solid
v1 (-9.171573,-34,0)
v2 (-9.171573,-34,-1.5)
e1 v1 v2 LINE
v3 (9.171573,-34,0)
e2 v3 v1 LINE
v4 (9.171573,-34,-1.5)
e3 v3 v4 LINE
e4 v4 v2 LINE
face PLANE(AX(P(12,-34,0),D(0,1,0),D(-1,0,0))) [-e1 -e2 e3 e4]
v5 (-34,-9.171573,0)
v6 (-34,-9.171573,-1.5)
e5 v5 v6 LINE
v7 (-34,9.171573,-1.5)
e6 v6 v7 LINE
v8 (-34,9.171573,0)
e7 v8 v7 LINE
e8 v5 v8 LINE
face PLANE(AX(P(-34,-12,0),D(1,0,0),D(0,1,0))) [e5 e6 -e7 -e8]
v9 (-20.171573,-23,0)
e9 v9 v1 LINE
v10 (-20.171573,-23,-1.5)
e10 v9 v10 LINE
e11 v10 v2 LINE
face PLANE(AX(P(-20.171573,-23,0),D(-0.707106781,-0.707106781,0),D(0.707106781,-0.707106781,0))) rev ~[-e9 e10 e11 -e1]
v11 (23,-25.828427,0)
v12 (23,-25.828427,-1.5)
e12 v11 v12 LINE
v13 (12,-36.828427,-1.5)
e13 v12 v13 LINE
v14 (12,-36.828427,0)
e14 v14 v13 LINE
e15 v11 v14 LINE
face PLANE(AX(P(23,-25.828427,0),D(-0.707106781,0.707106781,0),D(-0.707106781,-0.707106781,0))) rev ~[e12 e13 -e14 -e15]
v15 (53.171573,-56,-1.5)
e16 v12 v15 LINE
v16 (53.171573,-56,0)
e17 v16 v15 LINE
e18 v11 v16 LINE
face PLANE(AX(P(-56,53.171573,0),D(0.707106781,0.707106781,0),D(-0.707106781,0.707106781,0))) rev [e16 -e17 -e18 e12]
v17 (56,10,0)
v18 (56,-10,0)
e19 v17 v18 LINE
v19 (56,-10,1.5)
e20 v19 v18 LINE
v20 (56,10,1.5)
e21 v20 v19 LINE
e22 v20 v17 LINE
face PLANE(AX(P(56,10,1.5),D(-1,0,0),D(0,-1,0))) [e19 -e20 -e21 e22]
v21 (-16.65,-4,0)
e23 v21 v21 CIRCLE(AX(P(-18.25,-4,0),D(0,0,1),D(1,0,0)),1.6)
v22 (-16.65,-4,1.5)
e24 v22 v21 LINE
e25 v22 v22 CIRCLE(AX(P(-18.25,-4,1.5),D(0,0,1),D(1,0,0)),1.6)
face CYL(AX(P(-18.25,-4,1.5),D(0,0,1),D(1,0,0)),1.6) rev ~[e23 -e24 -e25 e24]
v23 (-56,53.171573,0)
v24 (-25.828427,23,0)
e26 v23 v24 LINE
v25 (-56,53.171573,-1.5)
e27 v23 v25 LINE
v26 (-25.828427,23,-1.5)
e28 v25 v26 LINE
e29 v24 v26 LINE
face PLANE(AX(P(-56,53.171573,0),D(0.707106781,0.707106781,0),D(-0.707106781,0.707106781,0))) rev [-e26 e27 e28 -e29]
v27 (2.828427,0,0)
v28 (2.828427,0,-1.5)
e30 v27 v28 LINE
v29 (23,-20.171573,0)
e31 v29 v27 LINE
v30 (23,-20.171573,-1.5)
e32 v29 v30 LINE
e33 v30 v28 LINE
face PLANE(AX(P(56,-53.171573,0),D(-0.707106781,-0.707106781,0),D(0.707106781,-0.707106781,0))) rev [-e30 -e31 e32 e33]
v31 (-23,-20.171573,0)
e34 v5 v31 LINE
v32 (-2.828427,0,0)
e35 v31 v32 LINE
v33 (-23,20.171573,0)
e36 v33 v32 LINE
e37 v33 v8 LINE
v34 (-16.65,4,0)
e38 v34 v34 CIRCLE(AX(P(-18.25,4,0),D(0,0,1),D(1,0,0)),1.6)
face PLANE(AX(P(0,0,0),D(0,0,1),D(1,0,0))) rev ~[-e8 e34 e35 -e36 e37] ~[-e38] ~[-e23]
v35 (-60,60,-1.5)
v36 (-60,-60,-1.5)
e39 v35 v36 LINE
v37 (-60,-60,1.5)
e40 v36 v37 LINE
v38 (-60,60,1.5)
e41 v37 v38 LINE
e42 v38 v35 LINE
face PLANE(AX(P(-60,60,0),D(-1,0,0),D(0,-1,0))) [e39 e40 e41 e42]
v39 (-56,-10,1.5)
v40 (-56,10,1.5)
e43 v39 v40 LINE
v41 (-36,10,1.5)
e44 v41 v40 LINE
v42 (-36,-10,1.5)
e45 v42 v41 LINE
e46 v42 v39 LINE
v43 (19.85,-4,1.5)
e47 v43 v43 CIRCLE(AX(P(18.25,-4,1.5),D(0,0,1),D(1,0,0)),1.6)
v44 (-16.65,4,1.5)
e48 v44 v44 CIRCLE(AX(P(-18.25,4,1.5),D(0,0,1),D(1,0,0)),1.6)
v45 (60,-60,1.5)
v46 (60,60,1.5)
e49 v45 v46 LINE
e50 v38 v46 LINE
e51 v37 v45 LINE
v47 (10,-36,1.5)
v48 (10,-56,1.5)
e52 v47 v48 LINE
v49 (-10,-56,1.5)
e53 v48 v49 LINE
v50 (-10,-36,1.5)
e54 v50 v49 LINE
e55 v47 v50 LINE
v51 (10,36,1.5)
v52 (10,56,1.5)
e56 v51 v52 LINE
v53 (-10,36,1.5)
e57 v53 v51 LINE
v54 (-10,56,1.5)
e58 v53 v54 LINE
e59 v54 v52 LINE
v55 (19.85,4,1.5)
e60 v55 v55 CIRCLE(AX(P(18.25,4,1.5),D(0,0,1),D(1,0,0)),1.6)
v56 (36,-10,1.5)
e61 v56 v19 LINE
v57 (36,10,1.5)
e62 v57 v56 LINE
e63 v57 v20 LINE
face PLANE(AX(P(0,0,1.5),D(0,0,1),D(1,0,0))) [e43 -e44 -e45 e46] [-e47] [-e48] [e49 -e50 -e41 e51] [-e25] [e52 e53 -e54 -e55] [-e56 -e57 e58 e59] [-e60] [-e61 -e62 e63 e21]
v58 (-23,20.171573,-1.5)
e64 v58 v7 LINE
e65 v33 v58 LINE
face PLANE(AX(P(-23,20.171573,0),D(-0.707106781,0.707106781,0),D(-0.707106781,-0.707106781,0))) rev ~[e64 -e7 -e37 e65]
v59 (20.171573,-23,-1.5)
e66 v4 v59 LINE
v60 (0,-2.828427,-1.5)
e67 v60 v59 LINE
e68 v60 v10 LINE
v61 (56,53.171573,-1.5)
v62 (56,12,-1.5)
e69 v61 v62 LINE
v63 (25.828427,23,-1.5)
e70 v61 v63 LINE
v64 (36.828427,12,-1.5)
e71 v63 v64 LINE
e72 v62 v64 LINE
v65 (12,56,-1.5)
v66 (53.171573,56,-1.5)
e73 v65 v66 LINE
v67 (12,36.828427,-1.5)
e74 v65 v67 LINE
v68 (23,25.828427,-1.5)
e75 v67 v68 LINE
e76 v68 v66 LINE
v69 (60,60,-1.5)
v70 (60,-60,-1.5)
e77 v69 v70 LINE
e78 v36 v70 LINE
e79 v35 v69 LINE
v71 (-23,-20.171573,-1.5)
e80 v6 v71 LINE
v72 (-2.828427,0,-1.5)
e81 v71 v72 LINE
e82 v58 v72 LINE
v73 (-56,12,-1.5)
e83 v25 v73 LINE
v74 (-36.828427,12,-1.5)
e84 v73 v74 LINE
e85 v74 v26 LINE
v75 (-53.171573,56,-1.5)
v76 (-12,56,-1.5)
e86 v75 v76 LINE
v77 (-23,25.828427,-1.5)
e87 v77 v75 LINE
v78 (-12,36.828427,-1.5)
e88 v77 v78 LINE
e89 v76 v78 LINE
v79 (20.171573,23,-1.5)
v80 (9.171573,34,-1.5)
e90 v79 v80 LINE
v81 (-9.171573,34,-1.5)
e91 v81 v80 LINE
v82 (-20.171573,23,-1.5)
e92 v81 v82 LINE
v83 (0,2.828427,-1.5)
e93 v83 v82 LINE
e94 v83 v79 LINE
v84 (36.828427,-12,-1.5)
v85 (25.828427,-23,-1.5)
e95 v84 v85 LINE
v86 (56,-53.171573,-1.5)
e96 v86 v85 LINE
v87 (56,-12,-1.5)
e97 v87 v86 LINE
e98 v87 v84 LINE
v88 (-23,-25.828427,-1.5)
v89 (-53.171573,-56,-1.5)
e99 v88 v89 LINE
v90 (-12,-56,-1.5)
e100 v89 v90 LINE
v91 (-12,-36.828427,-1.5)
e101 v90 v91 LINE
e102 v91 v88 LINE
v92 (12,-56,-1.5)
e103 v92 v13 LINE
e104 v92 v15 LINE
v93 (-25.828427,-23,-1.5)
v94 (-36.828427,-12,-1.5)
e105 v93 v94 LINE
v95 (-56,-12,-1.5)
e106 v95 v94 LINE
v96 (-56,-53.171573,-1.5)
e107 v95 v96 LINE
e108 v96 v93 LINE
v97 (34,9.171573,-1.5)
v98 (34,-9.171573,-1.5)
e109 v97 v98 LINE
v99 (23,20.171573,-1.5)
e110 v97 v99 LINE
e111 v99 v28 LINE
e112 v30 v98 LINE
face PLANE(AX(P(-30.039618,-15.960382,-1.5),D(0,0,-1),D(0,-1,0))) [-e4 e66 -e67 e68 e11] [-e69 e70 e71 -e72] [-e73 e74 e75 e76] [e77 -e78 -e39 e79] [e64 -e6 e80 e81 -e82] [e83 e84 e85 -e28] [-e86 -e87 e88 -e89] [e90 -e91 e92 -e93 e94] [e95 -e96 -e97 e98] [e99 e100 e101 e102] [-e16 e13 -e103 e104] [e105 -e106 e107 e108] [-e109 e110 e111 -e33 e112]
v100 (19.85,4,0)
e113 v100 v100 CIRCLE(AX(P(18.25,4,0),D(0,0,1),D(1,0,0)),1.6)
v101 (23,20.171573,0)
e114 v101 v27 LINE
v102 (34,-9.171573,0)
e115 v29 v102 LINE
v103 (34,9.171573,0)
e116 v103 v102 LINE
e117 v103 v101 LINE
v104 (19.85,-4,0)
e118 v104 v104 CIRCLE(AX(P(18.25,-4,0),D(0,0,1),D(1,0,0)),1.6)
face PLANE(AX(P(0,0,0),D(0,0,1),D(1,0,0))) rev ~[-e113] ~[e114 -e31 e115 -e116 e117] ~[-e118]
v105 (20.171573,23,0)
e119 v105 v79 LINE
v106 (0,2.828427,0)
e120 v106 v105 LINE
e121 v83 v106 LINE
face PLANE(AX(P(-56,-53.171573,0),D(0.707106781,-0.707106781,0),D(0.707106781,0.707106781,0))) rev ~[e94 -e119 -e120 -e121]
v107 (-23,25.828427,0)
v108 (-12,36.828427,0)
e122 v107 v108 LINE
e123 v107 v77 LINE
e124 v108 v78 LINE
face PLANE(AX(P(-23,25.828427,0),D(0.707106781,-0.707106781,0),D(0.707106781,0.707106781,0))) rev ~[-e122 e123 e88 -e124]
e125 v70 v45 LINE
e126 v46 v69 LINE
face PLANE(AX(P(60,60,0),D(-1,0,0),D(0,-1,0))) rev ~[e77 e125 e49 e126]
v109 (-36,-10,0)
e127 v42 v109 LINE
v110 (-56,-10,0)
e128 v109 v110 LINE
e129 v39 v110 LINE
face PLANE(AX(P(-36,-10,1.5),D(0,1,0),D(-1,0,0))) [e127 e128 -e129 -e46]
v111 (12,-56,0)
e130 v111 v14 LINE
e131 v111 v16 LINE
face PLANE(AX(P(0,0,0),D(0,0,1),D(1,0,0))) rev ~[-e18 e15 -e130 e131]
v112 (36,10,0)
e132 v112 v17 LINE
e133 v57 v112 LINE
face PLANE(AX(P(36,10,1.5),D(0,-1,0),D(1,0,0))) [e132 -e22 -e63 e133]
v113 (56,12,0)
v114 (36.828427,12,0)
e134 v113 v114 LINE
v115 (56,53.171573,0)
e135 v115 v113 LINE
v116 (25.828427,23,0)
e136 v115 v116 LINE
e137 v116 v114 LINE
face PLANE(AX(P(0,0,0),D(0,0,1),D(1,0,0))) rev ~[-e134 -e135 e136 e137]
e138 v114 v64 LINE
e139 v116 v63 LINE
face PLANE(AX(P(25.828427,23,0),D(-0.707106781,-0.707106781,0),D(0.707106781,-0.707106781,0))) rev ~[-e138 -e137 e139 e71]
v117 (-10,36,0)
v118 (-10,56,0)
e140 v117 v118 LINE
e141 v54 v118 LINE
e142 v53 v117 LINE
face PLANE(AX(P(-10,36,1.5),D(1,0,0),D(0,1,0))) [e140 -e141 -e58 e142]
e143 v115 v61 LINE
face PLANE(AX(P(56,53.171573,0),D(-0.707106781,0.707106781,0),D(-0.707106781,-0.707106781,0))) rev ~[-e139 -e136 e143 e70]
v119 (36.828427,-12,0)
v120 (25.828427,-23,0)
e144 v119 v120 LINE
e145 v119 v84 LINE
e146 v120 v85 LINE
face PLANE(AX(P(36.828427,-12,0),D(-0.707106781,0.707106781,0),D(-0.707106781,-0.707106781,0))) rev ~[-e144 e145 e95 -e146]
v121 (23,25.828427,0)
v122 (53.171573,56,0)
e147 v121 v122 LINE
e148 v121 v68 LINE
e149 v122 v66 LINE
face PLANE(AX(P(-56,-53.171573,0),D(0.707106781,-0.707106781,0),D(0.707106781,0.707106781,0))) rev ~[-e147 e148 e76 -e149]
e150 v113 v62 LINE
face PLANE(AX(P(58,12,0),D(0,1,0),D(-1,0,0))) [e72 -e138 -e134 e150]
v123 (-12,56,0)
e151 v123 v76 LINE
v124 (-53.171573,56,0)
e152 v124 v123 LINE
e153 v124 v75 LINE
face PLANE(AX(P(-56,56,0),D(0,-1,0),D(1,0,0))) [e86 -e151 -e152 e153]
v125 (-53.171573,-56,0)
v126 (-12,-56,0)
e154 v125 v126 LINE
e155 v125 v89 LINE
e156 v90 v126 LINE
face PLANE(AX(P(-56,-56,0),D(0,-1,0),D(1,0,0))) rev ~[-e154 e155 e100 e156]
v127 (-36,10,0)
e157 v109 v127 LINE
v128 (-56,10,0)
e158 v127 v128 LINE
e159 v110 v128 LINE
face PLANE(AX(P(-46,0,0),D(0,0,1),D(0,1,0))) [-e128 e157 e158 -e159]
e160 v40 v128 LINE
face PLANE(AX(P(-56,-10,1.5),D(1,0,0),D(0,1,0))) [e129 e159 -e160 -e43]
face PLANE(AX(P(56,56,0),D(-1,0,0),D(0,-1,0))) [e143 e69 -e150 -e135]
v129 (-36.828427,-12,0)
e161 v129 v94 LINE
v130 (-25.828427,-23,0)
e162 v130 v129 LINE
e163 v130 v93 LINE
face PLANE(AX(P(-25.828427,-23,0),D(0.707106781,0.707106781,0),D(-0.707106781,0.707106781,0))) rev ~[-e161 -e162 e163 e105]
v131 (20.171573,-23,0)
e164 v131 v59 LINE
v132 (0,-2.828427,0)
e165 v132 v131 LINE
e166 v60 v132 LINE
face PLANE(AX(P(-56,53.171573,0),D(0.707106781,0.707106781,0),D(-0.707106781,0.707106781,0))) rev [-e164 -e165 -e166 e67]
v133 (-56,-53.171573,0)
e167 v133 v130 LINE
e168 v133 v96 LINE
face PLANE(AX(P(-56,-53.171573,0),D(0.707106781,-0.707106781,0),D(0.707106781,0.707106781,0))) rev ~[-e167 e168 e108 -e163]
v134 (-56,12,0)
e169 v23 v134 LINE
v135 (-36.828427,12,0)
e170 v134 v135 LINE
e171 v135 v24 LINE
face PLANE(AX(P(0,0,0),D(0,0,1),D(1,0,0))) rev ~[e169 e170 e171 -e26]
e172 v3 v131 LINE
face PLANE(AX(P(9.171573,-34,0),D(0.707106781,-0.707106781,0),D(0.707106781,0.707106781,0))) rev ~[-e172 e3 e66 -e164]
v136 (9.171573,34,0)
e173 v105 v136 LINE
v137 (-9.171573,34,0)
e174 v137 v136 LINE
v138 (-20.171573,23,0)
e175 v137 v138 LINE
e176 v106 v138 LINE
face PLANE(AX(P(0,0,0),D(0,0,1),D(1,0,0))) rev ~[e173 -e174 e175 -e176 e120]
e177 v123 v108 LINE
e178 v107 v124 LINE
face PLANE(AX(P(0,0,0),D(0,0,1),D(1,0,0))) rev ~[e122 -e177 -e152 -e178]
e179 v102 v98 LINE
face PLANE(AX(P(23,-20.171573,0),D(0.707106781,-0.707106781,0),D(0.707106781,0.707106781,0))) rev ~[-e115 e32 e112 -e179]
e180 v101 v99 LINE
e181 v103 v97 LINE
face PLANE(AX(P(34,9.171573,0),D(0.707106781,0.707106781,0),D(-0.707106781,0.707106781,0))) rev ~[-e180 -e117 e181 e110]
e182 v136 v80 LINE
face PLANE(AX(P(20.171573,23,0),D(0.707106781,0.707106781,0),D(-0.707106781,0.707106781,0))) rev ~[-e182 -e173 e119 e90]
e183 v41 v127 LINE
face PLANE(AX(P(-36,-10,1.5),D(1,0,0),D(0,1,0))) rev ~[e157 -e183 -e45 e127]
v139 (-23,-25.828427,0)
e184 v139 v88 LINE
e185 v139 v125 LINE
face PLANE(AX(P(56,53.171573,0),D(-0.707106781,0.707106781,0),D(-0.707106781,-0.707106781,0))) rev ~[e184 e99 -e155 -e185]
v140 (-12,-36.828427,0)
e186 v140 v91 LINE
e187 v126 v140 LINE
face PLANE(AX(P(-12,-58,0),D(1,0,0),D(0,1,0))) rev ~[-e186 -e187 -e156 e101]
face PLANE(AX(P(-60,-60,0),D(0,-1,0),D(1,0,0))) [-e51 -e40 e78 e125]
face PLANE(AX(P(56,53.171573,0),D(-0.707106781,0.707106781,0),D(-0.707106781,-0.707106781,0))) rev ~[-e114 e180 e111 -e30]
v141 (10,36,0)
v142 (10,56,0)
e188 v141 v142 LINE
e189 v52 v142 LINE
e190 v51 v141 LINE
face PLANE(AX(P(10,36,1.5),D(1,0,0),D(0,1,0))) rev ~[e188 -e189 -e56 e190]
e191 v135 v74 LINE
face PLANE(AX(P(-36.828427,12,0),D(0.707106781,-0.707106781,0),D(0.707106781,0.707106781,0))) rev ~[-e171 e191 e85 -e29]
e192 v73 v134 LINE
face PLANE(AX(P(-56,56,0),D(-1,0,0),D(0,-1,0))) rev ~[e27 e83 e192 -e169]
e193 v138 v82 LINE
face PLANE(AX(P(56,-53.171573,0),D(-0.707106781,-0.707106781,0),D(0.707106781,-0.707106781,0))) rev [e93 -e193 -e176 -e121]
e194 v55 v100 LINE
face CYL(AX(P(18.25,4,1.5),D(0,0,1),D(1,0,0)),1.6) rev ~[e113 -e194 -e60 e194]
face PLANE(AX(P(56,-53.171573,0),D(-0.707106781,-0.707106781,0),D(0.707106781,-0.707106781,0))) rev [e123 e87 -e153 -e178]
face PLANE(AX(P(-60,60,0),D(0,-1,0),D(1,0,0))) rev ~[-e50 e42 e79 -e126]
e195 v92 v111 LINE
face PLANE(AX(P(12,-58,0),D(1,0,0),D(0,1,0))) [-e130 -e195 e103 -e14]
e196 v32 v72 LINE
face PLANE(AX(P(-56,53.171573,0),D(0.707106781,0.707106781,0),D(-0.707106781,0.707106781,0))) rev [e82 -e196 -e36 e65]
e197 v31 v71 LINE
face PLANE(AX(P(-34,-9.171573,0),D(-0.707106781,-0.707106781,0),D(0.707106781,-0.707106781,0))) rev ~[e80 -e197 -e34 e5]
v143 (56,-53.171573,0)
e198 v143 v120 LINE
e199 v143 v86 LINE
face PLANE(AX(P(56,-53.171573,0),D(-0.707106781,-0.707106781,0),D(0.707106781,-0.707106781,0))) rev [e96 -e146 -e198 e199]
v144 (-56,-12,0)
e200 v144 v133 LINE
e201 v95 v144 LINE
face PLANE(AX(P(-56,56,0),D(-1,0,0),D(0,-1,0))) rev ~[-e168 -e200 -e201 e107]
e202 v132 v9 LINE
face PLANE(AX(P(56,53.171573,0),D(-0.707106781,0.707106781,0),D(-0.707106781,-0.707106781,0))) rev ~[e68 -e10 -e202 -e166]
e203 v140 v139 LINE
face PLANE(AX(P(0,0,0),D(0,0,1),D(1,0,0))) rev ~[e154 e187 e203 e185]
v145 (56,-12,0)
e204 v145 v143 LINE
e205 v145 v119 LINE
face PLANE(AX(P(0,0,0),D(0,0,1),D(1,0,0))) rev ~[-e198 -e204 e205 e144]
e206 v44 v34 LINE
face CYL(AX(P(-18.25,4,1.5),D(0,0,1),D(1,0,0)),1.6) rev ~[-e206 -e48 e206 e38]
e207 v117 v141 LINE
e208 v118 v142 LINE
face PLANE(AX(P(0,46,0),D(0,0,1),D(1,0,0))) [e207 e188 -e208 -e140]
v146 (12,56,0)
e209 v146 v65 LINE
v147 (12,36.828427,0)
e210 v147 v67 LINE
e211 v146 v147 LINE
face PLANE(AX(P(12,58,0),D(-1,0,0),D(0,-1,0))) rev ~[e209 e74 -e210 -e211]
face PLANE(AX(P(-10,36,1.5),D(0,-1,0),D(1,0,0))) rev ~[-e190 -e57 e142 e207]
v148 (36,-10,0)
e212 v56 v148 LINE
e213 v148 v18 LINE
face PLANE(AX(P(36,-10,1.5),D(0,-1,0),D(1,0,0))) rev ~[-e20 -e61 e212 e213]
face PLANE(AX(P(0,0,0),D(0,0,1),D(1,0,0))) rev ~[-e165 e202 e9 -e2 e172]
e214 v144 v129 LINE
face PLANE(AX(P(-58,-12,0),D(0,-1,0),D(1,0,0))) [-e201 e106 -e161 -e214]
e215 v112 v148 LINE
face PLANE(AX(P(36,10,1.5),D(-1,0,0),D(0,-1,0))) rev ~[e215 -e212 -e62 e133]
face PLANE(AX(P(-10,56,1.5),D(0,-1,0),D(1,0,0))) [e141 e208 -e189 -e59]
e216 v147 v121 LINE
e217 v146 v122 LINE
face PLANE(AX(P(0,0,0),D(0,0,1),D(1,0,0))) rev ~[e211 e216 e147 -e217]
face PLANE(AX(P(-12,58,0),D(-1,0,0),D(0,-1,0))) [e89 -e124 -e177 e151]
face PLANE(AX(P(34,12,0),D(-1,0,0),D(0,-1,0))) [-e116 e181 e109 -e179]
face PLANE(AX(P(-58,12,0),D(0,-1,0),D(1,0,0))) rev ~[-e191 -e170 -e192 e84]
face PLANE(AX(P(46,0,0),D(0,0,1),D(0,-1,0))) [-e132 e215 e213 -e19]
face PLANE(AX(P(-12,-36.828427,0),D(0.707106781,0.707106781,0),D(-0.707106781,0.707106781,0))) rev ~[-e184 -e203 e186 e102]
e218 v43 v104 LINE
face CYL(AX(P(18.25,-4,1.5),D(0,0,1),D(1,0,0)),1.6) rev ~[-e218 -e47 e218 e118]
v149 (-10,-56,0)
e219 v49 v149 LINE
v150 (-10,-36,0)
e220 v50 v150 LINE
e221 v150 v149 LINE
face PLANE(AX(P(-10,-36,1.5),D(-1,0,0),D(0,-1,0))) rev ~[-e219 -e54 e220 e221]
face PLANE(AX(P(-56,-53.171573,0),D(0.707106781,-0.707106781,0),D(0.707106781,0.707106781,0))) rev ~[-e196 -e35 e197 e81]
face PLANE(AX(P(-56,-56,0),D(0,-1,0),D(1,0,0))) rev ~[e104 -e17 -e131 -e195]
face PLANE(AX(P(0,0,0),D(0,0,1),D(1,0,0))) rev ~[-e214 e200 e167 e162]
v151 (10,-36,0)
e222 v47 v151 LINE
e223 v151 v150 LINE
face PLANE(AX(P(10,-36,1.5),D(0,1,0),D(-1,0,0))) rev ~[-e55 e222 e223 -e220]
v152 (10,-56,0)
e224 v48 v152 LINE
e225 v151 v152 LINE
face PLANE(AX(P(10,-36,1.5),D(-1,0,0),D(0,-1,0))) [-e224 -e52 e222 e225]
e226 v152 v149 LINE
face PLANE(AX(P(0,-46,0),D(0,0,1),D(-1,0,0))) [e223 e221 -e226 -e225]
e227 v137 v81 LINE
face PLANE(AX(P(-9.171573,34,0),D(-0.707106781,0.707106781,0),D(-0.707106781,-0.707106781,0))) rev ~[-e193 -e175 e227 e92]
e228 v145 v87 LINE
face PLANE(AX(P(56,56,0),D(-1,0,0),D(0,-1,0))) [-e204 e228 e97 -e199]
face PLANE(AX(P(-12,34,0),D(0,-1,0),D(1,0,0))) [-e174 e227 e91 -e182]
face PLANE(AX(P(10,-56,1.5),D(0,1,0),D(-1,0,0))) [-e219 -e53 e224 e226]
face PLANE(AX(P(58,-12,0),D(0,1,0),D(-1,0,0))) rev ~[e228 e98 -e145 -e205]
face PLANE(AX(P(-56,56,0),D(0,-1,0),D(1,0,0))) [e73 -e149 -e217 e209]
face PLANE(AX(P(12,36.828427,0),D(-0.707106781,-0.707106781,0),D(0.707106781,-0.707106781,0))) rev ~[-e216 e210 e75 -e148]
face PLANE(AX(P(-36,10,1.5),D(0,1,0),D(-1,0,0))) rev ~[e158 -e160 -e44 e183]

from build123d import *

# Parameters (mm, degrees)
F0_W             = 120
F0_H             = 120
F1_DEPTH         = 1.5
F5_W             = 120
F5_H             = 120
F5_W_2           = 112
F5_H_2           = 112
F6_DEPTH         = 1.5
F4_W             = 24
F4_H             = 24
F7_DEPTH         = 1.5
F7_COPIES_COUNT  = 4
F2_W             = 20
F2_H             = 20
F8_DEPTH         = 1.5
F8_COPIES_COUNT  = 4
F10_DEPTH        = 1.5
F12_DEPTH        = 1.5
F12_COPIES_COUNT = 4
F14_DEPTH        = 1.5
F14_COPIES_COUNT = 4
F16_R            = 1.6
F17_DEPTH        = 1.5


# Not quite as in the source:
# - a pattern or mirror of a feature is missing from the dataset's text; its kind, count and spacing are read off the source's solid


with BuildPart() as f1:
    # F0 (on Top) → F1 (new body)
    with BuildSketch(Plane.XY):
        Rectangle(F0_W, F0_H)
    extrude(amount=F1_DEPTH)

    # F5 (on face) → F6 (join)
    with BuildSketch(Plane(origin=(0, 0, 0), x_dir=(1, 0, 0), z_dir=(0, 0, -1))):
        Rectangle(F5_W, F5_H)
        Rectangle(F5_W_2, F5_H_2, mode=Mode.SUBTRACT)
    extrude(amount=F6_DEPTH)

    # F4 (on face) → F7 (join)
    with BuildSketch(Plane(origin=(0, 0, 0), x_dir=(1, 0, 0), z_dir=(0, 0, -1))):
        with Locations((0, -46)):
            Rectangle(F4_W, F4_H)
    f7 = extrude(amount=F7_DEPTH)

    # F7_copies: F7 ×4 about axis
    f7_copies_axis = Axis((0, 0, 0), (0, 0, 1))
    for i in range(1, F7_COPIES_COUNT):
        add(f7.rotate(f7_copies_axis, i * 360 / F7_COPIES_COUNT))

    # F2 (on face) → F8 (cut)
    with BuildSketch(Plane.XY.offset(1.5)):
        with Locations((0, 46)):
            Rectangle(F2_W, F2_H)
    f8 = extrude(amount=-F8_DEPTH, mode=Mode.SUBTRACT)

    # F8_copies: F8 ×4 about axis
    f8_copies_axis = Axis((0, 0, 0), (0, 0, 1))
    for i in range(1, F8_COPIES_COUNT):
        add(f8.rotate(f8_copies_axis, i * 360 / F8_COPIES_COUNT), mode=Mode.SUBTRACT)

    # F9 (on face) → F10 (join)
    with BuildSketch(Plane(origin=(0, 0, 0), x_dir=(1, 0, 0), z_dir=(0, 0, -1))):
        Polygon((-56, 56), (-56, 53.1715728753), (53.1715728753, -56), (56, -56), (56, -53.1715728753), (-53.1715728753, 56), align=None)
    f10 = extrude(amount=F10_DEPTH)

    # F10_copies: F10 across plane
    add(f10.mirror(Plane(origin=(0, 0, 0), x_dir=(0, 0, -1), z_dir=(-1, 0, 0))))

    # F11 (on face) → F12 (join)
    with BuildSketch(Plane(origin=(0, 0, 0), x_dir=(1, 0, 0), z_dir=(0, 0, -1))):
        Polygon((34, 9.1715728753), (34, 12), (36.8284271247, 12), (25.8284271247, 23), (23, 20.1715728753), align=None)
    f12 = extrude(amount=F12_DEPTH)

    # F12_copies: F12 ×4 about axis
    f12_copies_axis = Axis((0, 0, 0), (0, 0, 1))
    for i in range(1, F12_COPIES_COUNT):
        add(f12.rotate(f12_copies_axis, i * 360 / F12_COPIES_COUNT))

    # F13 (on face) → F14 (join)
    with BuildSketch(Plane(origin=(0, 0, 0), x_dir=(1, 0, 0), z_dir=(0, 0, -1))):
        Polygon((12, 36.8284271247), (12, 34), (9.1715728753, 34), (20.1715728753, 23), (23, 25.8284271247), align=None)
    f14 = extrude(amount=F14_DEPTH)

    # F14_copies: F14 ×4 about axis
    f14_copies_axis = Axis((0, 0, 0), (0, 0, 1))
    for i in range(1, F14_COPIES_COUNT):
        add(f14.rotate(f14_copies_axis, i * 360 / F14_COPIES_COUNT))

    # F16 (on face) → F17 (cut)
    with BuildSketch(Plane.XY.offset(1.5)):
        with Locations((18.25, 4)):
            Circle(F16_R)
        with Locations((18.25, -4)):
            Circle(F16_R)
        with Locations((-18.25, -4)):
            Circle(F16_R)
        with Locations((-18.25, 4)):
            Circle(F16_R)
    extrude(amount=-F17_DEPTH, mode=Mode.SUBTRACT)


solid = f1.part
